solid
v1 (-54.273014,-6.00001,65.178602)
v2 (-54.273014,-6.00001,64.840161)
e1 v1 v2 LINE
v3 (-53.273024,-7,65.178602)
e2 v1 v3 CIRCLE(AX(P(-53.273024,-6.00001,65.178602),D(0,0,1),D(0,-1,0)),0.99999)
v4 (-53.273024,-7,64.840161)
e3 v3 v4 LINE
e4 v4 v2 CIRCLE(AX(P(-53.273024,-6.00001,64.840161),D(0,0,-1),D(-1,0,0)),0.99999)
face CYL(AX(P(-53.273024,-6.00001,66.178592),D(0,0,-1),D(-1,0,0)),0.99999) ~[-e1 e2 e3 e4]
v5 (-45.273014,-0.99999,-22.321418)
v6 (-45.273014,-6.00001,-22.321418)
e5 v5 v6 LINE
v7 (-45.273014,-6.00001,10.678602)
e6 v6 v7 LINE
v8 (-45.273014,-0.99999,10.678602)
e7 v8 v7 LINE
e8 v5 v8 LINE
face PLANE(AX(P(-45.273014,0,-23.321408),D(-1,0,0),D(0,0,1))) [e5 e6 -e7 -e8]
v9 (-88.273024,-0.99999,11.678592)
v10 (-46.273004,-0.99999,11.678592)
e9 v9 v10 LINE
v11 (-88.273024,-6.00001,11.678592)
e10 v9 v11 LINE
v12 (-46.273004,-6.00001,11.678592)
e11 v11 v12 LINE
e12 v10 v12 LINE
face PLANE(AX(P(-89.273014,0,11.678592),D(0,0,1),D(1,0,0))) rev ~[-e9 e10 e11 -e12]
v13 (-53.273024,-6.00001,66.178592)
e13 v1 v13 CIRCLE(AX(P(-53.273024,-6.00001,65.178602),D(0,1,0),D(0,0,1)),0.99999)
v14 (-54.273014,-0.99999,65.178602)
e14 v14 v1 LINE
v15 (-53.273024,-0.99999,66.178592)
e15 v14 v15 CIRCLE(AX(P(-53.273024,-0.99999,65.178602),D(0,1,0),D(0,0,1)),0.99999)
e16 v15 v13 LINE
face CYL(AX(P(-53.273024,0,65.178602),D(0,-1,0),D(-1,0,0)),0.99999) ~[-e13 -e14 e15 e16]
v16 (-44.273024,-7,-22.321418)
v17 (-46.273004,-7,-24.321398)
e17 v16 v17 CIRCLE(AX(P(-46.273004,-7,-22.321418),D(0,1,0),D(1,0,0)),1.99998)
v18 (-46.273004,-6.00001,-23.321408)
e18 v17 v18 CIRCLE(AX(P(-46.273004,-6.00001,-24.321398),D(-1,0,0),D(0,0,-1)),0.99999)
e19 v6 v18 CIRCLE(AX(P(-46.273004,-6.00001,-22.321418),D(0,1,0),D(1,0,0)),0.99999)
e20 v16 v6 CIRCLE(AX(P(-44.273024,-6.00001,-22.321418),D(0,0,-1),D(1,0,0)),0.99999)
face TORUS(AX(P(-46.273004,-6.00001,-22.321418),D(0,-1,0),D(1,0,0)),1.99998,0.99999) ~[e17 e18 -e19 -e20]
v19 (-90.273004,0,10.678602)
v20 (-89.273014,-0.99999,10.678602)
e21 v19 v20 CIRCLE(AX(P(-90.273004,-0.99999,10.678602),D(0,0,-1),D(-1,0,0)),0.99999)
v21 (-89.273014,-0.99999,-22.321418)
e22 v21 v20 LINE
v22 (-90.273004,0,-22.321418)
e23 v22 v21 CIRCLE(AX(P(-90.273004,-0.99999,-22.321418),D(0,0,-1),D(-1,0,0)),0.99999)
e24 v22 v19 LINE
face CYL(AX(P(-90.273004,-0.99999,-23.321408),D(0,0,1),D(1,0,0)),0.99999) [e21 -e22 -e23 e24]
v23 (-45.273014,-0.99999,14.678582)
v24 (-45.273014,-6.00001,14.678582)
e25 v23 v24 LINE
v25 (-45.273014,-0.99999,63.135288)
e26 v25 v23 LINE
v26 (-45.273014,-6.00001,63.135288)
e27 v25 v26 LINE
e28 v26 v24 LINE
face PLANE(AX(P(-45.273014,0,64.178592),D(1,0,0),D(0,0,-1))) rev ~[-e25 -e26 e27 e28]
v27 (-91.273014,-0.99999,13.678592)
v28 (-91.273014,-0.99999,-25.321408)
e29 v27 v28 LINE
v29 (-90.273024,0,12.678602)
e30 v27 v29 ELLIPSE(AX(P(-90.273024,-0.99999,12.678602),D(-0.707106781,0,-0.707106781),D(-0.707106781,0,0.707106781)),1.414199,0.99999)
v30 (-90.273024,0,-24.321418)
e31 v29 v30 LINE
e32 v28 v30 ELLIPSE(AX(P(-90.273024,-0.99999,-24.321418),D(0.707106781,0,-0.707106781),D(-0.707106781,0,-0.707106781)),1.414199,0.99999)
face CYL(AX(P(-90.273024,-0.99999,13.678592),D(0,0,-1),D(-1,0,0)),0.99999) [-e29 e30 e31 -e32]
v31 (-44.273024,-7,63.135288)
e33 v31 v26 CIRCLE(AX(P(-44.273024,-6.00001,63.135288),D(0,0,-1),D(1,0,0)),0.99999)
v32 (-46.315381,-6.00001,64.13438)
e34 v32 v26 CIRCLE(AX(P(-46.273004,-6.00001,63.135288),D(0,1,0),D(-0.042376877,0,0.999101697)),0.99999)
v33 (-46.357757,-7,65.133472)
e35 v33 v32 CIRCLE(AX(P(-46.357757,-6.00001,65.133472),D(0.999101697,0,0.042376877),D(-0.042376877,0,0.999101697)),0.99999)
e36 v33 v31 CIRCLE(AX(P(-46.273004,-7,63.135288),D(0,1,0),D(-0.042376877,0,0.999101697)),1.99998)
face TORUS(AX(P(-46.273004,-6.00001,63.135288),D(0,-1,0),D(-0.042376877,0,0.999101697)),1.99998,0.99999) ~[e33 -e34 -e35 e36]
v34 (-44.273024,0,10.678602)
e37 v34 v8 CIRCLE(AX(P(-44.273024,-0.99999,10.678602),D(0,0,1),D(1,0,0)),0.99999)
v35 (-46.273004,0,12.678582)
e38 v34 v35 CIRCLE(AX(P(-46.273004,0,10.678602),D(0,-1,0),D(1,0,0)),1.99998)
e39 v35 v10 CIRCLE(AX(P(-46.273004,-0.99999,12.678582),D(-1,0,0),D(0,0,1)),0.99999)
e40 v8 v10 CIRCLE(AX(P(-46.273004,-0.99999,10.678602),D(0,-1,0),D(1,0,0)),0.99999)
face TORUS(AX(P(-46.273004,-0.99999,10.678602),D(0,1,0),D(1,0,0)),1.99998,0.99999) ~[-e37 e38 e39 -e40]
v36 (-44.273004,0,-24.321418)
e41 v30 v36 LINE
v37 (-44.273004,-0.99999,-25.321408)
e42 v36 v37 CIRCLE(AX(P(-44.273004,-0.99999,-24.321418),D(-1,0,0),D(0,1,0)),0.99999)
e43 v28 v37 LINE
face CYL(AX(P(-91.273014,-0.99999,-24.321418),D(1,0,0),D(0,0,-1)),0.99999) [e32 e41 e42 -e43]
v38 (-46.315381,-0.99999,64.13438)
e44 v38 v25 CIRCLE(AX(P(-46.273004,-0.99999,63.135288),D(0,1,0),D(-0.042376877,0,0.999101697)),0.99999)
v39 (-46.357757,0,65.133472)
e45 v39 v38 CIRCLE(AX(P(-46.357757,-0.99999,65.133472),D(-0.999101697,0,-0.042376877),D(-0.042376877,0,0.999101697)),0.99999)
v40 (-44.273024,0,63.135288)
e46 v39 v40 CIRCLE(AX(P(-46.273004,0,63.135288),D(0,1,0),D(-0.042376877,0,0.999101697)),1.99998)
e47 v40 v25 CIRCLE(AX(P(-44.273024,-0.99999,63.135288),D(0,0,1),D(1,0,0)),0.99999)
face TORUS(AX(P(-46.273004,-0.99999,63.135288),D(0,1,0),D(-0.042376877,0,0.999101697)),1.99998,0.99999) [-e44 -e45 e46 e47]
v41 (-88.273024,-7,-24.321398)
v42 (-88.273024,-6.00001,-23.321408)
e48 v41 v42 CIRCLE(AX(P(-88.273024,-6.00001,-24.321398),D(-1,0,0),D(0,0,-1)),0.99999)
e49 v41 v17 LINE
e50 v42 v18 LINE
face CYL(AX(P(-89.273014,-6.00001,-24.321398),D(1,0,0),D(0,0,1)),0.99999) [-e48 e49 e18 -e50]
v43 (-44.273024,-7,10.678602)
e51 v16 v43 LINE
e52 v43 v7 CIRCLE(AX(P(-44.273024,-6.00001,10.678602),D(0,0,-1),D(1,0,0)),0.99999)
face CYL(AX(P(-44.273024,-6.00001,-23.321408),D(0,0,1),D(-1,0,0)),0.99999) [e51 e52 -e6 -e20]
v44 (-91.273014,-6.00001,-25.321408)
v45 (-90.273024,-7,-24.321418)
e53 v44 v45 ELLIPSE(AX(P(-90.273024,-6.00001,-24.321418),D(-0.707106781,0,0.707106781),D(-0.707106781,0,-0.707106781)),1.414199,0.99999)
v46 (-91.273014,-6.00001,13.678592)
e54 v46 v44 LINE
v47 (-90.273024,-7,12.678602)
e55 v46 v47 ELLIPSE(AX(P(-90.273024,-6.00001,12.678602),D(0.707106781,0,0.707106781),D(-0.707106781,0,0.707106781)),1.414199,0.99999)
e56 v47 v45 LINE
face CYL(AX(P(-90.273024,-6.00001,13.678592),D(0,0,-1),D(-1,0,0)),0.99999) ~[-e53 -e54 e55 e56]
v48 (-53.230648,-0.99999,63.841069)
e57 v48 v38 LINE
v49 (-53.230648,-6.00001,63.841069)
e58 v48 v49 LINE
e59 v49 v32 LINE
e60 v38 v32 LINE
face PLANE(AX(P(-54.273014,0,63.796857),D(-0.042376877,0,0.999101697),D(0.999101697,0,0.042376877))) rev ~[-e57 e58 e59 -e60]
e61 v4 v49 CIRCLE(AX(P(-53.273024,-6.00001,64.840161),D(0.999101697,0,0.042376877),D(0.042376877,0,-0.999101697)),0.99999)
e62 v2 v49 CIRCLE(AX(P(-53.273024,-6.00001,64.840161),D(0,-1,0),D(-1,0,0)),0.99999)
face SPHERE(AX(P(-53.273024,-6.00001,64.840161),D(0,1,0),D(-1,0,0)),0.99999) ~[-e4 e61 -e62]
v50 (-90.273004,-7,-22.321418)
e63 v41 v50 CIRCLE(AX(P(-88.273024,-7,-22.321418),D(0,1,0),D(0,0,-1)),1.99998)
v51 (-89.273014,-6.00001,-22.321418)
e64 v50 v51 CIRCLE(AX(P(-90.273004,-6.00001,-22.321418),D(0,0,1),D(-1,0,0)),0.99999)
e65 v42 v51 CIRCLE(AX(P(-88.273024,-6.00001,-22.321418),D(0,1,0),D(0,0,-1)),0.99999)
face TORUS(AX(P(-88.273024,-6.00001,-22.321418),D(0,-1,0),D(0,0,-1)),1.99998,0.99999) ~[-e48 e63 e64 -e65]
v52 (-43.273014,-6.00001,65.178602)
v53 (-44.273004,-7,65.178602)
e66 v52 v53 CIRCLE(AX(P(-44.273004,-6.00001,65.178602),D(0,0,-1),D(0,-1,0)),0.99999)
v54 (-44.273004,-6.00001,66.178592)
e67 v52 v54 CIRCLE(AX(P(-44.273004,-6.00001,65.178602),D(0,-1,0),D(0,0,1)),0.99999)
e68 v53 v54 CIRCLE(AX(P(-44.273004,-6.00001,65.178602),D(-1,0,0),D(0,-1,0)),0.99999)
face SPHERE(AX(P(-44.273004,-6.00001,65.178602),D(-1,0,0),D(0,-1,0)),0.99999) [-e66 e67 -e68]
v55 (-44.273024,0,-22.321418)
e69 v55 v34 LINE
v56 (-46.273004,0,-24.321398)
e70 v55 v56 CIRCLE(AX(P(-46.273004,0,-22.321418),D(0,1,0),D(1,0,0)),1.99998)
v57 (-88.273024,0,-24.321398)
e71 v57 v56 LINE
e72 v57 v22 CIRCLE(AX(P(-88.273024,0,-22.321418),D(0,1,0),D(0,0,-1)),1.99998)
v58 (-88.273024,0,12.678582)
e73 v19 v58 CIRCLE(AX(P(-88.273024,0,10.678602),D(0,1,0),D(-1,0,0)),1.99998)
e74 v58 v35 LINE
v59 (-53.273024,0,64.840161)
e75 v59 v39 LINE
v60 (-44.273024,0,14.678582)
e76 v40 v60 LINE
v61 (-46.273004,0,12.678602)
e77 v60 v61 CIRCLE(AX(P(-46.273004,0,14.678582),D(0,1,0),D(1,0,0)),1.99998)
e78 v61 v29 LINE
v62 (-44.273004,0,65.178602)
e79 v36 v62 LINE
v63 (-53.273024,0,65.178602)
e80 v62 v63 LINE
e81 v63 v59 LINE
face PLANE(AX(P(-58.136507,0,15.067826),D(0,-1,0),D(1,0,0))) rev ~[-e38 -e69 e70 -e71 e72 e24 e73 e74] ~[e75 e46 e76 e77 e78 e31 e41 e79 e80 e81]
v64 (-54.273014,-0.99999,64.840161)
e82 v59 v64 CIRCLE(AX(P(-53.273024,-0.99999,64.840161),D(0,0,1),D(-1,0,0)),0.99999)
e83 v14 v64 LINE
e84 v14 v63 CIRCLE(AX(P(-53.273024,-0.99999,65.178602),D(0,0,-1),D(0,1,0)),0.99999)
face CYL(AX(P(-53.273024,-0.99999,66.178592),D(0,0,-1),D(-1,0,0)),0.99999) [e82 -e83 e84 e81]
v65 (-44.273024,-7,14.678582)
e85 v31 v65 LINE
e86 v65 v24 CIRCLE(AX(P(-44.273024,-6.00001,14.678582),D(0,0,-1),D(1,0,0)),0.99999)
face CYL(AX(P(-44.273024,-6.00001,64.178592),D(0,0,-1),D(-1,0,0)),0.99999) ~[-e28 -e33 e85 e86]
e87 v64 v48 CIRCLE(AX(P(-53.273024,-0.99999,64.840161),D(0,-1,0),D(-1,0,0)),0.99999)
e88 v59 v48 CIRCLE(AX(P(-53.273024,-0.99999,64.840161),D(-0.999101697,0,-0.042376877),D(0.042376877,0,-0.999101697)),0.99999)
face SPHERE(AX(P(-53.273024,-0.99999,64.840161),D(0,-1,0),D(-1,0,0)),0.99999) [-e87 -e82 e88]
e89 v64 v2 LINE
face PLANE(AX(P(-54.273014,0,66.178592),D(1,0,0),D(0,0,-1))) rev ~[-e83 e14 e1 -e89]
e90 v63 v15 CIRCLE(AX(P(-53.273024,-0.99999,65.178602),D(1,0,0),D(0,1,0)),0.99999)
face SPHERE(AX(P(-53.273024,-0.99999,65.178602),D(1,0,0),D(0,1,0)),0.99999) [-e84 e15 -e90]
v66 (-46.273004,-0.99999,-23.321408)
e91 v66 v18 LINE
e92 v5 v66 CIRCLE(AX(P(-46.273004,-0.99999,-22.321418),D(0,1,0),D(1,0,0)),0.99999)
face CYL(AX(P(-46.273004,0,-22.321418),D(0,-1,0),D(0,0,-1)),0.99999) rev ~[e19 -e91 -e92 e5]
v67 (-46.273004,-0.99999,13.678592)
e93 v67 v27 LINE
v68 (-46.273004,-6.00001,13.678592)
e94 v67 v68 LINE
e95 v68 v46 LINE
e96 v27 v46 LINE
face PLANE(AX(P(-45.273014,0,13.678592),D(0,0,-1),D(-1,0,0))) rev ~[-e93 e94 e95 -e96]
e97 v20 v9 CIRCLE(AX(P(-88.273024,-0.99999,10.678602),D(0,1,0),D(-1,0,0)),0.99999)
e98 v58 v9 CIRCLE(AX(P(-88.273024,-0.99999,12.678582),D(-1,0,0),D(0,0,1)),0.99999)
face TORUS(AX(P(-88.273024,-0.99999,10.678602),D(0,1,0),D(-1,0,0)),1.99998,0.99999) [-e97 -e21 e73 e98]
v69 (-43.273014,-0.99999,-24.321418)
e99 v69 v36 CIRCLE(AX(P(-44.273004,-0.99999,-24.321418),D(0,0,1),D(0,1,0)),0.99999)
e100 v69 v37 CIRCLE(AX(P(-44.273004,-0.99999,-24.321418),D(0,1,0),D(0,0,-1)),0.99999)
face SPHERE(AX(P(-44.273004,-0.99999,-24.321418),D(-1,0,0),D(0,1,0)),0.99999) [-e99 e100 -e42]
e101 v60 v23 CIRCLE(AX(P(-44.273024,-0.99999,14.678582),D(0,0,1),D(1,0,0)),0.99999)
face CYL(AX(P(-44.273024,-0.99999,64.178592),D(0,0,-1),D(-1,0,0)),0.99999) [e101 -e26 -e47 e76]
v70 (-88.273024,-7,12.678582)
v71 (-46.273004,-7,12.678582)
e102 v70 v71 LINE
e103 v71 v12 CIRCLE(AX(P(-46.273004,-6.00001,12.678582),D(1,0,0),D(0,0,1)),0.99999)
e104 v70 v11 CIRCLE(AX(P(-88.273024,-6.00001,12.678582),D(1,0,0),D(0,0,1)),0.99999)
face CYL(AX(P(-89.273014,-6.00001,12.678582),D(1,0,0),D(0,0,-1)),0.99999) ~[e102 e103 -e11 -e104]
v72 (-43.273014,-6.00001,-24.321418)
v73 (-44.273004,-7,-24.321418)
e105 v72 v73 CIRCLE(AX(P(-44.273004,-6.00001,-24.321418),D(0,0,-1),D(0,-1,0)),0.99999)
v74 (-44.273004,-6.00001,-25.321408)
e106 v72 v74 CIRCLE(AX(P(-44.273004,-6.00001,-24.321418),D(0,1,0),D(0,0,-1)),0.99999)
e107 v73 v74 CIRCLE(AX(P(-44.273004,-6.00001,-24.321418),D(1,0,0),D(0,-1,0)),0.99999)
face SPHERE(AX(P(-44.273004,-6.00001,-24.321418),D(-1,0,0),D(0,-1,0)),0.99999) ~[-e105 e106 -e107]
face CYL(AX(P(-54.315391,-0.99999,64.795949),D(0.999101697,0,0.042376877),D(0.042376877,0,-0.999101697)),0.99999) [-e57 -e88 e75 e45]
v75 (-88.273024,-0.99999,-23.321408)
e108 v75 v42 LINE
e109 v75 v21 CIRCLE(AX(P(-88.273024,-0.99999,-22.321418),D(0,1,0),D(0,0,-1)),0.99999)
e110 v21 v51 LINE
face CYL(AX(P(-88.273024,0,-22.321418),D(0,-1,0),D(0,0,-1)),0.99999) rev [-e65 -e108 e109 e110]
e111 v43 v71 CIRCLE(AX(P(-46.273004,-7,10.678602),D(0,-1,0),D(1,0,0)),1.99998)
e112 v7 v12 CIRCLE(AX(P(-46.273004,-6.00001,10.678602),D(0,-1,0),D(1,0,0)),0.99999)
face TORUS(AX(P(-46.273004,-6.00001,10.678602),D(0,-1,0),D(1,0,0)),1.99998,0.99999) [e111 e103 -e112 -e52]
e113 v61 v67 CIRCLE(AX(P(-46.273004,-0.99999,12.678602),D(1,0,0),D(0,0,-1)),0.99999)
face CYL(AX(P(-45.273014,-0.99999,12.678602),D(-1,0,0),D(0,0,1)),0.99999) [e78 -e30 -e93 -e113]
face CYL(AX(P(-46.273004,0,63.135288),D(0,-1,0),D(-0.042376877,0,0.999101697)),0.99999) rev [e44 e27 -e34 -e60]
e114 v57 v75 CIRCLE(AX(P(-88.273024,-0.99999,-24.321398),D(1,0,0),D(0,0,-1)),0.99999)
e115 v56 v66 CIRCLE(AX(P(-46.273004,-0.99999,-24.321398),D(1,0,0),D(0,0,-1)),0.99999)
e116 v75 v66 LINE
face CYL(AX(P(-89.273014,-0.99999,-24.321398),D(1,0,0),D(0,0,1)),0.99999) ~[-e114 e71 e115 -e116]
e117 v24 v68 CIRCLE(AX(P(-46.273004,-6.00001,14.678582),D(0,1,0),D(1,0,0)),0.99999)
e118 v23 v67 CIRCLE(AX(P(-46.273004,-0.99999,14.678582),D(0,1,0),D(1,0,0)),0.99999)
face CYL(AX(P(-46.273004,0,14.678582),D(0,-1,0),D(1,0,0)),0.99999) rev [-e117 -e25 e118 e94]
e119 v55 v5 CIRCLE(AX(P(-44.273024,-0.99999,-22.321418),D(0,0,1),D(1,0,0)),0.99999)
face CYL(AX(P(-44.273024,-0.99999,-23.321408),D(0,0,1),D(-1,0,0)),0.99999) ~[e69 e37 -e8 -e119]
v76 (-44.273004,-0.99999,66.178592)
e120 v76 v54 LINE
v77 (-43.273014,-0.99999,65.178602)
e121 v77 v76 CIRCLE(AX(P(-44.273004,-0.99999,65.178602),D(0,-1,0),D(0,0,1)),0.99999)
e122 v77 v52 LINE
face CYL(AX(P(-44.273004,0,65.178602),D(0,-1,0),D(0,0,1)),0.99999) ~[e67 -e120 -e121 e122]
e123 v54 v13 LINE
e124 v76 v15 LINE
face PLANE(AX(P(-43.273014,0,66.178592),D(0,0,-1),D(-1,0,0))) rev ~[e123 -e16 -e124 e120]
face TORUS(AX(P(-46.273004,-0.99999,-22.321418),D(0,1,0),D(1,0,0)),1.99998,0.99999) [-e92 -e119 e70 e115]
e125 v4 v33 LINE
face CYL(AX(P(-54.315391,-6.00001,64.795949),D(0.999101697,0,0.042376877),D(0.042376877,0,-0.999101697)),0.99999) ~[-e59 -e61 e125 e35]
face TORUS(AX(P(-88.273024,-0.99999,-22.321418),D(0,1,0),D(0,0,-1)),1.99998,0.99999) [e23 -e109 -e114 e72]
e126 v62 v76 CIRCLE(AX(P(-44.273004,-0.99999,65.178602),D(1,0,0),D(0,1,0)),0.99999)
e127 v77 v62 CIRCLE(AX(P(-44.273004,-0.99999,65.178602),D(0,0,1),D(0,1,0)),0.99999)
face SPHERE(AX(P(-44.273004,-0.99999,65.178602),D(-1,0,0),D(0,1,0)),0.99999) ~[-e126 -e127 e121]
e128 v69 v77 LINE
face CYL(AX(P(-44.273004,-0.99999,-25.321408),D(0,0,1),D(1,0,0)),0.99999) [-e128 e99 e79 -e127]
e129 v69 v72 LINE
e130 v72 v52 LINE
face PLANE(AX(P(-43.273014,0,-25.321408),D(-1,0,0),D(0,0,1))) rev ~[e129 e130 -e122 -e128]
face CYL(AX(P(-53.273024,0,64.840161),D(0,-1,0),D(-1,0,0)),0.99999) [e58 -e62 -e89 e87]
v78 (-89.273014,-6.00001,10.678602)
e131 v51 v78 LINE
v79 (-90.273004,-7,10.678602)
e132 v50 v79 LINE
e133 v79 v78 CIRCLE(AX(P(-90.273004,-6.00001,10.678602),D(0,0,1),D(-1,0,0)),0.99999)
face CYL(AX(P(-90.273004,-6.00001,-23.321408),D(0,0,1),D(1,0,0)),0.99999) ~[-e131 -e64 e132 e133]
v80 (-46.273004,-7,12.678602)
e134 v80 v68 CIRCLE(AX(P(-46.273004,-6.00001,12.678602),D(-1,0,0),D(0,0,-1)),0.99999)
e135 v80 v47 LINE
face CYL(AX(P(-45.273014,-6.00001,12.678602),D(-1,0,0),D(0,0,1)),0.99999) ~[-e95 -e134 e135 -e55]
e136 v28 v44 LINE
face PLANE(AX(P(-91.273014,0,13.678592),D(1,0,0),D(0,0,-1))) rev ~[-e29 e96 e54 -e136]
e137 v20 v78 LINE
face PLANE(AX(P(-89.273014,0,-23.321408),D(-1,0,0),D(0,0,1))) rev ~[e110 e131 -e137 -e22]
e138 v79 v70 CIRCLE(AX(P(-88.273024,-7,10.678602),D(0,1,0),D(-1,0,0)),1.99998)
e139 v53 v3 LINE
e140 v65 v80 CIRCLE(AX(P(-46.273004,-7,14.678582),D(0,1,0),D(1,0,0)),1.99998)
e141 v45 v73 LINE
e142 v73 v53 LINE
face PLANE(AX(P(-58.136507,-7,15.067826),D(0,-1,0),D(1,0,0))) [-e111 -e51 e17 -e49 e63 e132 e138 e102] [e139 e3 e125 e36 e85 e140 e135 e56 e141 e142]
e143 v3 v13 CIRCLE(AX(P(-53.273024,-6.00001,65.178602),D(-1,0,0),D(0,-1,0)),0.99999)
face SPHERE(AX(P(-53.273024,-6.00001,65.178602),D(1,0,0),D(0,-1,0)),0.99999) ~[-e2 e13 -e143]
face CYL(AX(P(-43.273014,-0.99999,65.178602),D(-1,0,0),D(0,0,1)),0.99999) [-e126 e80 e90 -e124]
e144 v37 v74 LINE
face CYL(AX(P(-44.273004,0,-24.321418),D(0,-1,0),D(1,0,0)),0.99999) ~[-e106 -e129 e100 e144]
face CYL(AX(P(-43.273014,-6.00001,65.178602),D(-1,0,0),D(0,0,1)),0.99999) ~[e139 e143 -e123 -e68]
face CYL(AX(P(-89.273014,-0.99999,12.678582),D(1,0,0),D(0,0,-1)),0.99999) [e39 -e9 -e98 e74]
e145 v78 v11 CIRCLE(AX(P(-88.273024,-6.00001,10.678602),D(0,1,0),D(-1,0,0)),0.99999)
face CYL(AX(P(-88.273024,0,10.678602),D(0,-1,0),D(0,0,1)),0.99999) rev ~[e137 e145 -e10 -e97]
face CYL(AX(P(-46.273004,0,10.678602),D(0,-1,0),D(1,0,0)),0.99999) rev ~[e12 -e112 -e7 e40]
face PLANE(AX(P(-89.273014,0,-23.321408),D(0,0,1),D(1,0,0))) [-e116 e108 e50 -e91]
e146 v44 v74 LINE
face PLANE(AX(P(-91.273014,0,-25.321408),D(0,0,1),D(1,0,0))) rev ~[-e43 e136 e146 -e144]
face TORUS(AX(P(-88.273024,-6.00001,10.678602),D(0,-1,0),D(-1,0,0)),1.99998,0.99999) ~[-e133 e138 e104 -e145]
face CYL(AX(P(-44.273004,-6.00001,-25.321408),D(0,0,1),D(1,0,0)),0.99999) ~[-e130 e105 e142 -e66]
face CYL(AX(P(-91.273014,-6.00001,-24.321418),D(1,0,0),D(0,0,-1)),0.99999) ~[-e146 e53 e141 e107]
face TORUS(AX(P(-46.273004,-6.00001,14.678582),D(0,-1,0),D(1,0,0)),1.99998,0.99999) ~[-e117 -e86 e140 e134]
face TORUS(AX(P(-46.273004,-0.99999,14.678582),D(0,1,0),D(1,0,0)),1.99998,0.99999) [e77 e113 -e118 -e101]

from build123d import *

# Parameters (mm, degrees)
F0_W     = 44
F0_H     = 35
F1_DEPTH = 7
F2_R     = 0.99999


# Not quite as in the source:
# - a fillet or chamfer is up to 0.001 mm smaller than in the source, because OpenCascade refuses the exact size


with BuildPart() as f1:
    # F0 (on Front) → F1 (new body)
    with BuildSketch(Plane.XZ):
        Polygon((-54.2730142517, 66.1785921497), (-54.2730142517, 63.7968573394), (-45.2730142517, 64.1785921497), (-45.2730142517, 13.6785921497), (-91.2730142517, 13.6785921497), (-91.2730142517, 11.6785921497), (-91.2730142517, -23.3214078503), (-91.2730142517, -25.3214078503), (-43.2730142517, -25.3214078503), (-43.2730142517, 66.1785921497), align=None)
        with Locations((-67.2730142517, -5.8214078503)):
            Rectangle(F0_W, F0_H, mode=Mode.SUBTRACT)
    extrude(amount=F1_DEPTH)

    # F2 (radius 1 in the source; OpenCascade refuses exactly that, so slightly less here)
    f2_edges = [f1.edges().sort_by_distance(p)[0] for p in [
        (-48.773014, -7, 66.178592),
        (-54.273014, -7, 64.987725),
        (-49.773014, -7, 63.987725),
        (-45.273014, -7, 38.928592),
        (-68.273014, -7, 13.678592),
        (-91.273014, -7, -5.821408),
        (-67.273014, -7, -25.321408),
        (-43.273014, -7, 20.428592),
        (-45.273014, -7, -5.821408),
        (-67.273014, -7, -23.321408),
        (-89.273014, -7, -5.821408),
        (-67.273014, -7, 11.678592),
        (-48.773014, 0, 66.178592),
        (-54.273014, 0, 64.987725),
        (-49.773014, 0, 63.987725),
        (-45.273014, 0, 38.928592),
        (-68.273014, 0, 13.678592),
        (-91.273014, 0, -5.821408),
        (-67.273014, 0, -25.321408),
        (-43.273014, 0, 20.428592),
        (-45.273014, 0, -5.821408),
        (-67.273014, 0, -23.321408),
        (-89.273014, 0, -5.821408),
        (-67.273014, 0, 11.678592),
        (-45.273014, -3.5, 11.678592),
        (-45.273014, -3.5, -23.321408),
        (-89.273014, -3.5, 11.678592),
        (-89.273014, -3.5, -23.321408),
        (-54.273014, -3.5, 63.796857),
        (-45.273014, -3.5, 64.178592),
        (-54.273014, -3.5, 66.178592),
        (-43.273014, -3.5, 66.178592),
        (-45.273014, -3.5, 13.678592),
        (-43.273014, -3.5, -25.321408),
    ]]
    fillet(f2_edges, radius=F2_R)


solid = f1.part
